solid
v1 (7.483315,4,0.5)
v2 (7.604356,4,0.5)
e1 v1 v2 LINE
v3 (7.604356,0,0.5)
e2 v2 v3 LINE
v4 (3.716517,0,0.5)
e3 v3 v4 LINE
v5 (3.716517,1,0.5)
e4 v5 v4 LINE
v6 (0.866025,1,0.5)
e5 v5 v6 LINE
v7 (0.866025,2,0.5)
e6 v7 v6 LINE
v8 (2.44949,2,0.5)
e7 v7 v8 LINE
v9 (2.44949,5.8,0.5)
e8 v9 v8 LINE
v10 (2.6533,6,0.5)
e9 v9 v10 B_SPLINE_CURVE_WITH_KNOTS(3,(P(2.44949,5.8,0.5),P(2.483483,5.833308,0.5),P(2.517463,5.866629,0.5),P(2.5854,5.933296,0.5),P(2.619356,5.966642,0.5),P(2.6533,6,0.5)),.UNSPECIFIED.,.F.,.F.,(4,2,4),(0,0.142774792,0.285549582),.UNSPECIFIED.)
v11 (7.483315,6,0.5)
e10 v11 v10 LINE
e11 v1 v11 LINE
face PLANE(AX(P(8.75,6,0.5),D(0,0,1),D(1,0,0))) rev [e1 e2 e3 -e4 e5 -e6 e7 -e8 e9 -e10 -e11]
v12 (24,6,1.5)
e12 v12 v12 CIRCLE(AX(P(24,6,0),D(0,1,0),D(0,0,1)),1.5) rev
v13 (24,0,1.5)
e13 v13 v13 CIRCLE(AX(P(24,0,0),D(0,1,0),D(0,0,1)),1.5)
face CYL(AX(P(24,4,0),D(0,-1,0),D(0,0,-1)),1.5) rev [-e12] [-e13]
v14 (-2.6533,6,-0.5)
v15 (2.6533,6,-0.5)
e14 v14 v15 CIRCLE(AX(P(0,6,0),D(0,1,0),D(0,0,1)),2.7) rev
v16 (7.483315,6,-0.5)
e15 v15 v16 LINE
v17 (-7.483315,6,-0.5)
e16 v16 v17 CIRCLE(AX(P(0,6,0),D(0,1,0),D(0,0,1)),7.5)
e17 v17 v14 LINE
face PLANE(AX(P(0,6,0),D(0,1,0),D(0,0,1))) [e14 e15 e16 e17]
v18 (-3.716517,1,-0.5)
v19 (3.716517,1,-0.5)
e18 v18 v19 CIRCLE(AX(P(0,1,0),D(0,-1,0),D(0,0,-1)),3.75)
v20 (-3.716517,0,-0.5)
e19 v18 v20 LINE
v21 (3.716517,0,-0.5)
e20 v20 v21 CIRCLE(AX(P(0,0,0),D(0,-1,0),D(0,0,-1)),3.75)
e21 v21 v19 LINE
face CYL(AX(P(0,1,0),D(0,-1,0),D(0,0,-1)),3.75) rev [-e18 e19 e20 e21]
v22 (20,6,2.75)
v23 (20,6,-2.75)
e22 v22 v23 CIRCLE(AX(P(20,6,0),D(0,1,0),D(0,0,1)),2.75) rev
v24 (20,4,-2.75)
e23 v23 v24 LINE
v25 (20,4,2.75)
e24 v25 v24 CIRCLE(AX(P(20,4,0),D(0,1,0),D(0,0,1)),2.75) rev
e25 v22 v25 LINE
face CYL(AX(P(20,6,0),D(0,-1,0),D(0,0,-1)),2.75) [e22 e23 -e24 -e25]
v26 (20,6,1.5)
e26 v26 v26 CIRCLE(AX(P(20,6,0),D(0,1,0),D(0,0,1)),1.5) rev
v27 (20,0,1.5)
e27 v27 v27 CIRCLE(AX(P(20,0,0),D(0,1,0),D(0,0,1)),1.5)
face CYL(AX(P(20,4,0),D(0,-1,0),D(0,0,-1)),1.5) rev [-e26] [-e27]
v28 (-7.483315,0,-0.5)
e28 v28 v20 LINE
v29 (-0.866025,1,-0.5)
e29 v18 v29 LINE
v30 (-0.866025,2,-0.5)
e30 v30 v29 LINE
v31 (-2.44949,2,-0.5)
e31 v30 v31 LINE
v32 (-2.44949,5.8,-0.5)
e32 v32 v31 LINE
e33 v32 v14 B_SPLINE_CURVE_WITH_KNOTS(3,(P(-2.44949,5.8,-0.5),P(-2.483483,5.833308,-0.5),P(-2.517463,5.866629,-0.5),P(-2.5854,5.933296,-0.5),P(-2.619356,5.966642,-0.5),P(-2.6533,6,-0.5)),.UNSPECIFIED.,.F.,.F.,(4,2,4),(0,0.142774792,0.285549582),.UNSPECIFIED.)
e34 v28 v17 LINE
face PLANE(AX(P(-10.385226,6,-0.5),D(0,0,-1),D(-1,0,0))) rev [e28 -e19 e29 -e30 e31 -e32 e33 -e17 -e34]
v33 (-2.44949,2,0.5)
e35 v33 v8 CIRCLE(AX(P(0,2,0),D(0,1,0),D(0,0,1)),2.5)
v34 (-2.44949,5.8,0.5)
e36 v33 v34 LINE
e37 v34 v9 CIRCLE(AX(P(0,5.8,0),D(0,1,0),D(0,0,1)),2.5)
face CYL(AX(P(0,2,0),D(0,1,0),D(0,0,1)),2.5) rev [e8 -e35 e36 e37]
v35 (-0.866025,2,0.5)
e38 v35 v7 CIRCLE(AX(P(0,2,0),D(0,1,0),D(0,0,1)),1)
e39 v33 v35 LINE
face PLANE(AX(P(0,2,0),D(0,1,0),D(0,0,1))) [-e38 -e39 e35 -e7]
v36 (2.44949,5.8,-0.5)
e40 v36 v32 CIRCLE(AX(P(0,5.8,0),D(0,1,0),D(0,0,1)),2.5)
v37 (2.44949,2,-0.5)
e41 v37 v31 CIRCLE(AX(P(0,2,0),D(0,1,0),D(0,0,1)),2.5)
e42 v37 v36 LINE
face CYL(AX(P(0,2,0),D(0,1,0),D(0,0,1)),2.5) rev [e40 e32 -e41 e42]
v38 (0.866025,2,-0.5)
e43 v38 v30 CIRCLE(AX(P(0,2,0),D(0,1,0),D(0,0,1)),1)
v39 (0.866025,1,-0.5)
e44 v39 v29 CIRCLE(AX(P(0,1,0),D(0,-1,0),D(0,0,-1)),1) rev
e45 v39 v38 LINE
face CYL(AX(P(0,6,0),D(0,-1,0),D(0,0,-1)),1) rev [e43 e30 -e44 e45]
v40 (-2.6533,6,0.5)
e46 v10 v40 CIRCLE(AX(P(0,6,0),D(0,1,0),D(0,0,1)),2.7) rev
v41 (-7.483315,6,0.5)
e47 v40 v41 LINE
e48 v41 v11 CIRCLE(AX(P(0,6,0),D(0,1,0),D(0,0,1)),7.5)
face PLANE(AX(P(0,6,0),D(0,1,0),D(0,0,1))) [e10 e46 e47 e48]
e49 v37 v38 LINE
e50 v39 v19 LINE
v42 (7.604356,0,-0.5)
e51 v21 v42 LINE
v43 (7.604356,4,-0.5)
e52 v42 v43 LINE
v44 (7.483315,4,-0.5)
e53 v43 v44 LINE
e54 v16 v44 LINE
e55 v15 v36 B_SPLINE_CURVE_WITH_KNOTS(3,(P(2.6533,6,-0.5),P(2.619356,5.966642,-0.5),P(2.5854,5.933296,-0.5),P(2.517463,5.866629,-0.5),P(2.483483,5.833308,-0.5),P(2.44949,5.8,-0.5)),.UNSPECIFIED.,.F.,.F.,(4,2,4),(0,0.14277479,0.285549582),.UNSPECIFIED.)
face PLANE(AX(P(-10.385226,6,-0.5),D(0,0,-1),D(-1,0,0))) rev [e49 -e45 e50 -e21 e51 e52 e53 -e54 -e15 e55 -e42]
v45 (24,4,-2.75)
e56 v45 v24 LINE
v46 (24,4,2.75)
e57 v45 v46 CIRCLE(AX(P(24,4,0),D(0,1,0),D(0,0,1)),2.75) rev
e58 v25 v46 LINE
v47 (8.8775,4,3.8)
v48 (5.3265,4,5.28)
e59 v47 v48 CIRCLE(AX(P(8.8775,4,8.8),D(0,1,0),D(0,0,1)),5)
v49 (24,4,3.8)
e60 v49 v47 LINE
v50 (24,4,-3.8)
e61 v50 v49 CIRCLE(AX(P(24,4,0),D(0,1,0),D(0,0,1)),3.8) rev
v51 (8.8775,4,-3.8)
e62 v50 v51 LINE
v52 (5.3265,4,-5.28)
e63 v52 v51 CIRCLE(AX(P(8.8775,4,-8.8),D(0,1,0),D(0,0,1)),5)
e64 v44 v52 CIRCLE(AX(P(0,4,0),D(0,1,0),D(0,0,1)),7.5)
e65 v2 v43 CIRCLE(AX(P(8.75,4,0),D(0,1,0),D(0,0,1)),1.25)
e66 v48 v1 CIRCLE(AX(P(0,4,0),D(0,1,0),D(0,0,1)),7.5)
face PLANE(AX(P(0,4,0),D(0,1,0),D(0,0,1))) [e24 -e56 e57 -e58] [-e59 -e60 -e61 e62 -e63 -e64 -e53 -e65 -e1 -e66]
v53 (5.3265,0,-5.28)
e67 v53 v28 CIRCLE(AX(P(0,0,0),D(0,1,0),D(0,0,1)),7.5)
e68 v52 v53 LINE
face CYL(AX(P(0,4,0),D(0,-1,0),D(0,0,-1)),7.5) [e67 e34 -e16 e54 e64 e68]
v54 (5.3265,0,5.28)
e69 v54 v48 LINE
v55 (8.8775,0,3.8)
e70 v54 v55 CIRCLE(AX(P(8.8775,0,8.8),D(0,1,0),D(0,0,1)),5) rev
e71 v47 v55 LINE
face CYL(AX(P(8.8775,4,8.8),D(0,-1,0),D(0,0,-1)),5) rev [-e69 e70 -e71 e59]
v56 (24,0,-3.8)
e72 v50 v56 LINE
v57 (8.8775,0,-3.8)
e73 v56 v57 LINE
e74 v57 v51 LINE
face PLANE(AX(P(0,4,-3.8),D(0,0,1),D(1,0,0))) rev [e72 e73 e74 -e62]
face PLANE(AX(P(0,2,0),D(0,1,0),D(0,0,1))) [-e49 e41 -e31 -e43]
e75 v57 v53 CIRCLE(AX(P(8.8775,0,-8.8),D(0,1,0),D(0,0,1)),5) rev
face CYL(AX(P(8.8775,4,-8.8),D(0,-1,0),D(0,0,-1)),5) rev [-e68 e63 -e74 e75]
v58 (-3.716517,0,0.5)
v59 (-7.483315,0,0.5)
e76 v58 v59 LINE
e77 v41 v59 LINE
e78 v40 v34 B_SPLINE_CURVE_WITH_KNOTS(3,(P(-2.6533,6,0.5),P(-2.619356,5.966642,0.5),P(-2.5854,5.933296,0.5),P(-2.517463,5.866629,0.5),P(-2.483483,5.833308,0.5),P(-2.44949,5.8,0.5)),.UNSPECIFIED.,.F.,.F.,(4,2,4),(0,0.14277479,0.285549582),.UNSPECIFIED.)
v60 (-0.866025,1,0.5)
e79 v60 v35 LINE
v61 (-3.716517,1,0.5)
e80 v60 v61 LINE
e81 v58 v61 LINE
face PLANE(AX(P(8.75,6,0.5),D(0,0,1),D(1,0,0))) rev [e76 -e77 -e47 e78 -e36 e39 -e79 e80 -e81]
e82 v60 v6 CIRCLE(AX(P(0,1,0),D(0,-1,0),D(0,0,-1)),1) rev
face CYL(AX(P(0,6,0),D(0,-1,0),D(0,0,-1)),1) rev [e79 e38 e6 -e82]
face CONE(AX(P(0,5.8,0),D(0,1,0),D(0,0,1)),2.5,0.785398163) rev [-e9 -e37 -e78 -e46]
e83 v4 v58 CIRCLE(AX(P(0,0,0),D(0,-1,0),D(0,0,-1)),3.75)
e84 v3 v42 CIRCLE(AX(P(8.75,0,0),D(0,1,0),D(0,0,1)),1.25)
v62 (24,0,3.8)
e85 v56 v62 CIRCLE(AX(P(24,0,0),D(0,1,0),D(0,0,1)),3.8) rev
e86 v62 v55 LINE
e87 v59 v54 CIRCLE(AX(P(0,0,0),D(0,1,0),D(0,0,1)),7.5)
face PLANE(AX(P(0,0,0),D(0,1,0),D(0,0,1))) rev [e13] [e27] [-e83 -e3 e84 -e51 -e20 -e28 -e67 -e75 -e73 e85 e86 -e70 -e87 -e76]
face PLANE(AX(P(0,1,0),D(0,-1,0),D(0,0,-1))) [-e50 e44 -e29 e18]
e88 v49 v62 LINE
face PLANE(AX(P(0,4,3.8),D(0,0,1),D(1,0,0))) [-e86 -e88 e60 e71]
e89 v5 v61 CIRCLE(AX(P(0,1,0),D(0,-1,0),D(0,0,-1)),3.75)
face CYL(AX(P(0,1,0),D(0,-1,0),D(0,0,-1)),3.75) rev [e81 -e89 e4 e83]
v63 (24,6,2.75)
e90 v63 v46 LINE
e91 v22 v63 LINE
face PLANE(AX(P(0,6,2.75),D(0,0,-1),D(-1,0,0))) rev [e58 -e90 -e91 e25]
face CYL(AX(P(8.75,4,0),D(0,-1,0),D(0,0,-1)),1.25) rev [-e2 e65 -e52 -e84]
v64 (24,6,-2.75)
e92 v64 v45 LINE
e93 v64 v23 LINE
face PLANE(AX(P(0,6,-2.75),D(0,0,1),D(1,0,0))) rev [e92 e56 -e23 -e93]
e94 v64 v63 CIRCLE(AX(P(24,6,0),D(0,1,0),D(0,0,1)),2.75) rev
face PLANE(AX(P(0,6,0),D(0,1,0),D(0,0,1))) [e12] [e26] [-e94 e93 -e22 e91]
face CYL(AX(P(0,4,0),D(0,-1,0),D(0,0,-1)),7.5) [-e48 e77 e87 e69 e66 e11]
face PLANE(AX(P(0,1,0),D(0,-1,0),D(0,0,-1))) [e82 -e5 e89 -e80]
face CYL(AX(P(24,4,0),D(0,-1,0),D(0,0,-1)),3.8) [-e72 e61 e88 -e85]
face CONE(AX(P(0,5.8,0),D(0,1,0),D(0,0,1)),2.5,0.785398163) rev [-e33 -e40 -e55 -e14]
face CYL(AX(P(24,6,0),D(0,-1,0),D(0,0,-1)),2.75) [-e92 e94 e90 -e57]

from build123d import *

# Parameters (mm, degrees)
SKETCH1_R           = 1.2499999999999998
SKETCH1_R_2         = 1.5000000000000007
BOSS_EXTRUDE2_DEPTH = 4
SKETCH2_R           = 7.5
BOSS_EXTRUDE3_DEPTH = 2
SKETCH3_R           = 1.4999999999999967
BOSS_EXTRUDE4_DEPTH = 2
SKETCH4_R           = 2.5
CUT_EXTRUDE1_DEPTH  = 4
SKETCH5_R           = 1
CUT_EXTRUDE2_DEPTH  = 30.412412345810736
SKETCH6_R           = 3.75
CUT_EXTRUDE3_DEPTH  = 1
CUT_EXTRUDE4_DEPTH  = 30.412412345810736
FILLET2_R           = 5
FILLET3_R           = 5
CHAMFER1_SIZE       = 0.2


with BuildPart() as part:
    # Sketch1 → Boss-Extrude2 (new body)
    with BuildSketch(Plane(origin=(0, 0, 0), x_dir=(1, 0, 0), z_dir=(0, 1, 0))):
        with BuildLine():
            ThreePointArc((24, -3.8000000000000003), (27.799999999999997, 6e-17), (24, 3.8000000000000003))
            Line((24, 3.8), (6.466065264130883, 3.8))
            ThreePointArc((6.466065264130884, 3.8000000000000003), (-7.5, 9.2e-16), (6.466065264130884, -3.800000000000001))
            Line((6.466065264130883, -3.7999999999999994), (24, -3.7999999999999994))
        make_face()
        with Locations((8.75, -6.7e-16)):
            Circle(SKETCH1_R, mode=Mode.SUBTRACT)
        with Locations((20, 0)):
            Circle(SKETCH1_R_2, mode=Mode.SUBTRACT)
        with Locations((24, 0)):
            Circle(SKETCH1_R_2, mode=Mode.SUBTRACT)
    extrude(amount=BOSS_EXTRUDE2_DEPTH)

    # Sketch2 → Boss-Extrude3 (add)
    with BuildSketch(Plane(origin=(0, 4, 0), x_dir=(1, 0, 0), z_dir=(0, 1, 0))):
        Circle(SKETCH2_R)
    extrude(amount=BOSS_EXTRUDE3_DEPTH)

    # Sketch3 → Boss-Extrude4 (add)
    with BuildSketch(Plane(origin=(0, 4, 0), x_dir=(1, 0, 0), z_dir=(0, 1, 0))):
        with BuildLine():
            ThreePointArc((26.75, -5.5e-16), (25.944543648263004, 1.9445436482630067), (23.999999999999996, 2.75))
            Line((23.999999999999996, 2.7500000000000004), (19.999999999999996, 2.7500000000000004))
            ThreePointArc((19.999999999999996, 2.7500000000000004), (18.05545635173699, 1.9445436482630059), (17.249999999999996, -3.3e-16))
            ThreePointArc((17.249999999999996, -3.3e-16), (18.055456351736993, -1.9445436482630054), (19.999999999999996, -2.7499999999999996))
            Line((19.999999999999996, -2.7499999999999996), (23.999999999999996, -2.7500000000000004))
            ThreePointArc((23.999999999999996, -2.75), (25.944543648263004, -1.9445436482630074), (26.75, 6e-17))
        make_face()
        with BuildLine():
            ThreePointArc((21.499999999999996, 7e-17), (19.999999999999996, -1.5000000000000002), (18.499999999999996, 6.2e-16))
            ThreePointArc((18.499999999999996, 6.2e-16), (19.999999999999996, 1.500000000000001), (21.499999999999996, 4.3e-16))
        make_face(mode=Mode.SUBTRACT)
        with Locations((23.999999999999996, 0)):
            Circle(SKETCH3_R, mode=Mode.SUBTRACT)
    extrude(amount=BOSS_EXTRUDE4_DEPTH)

    # Sketch4 → Cut-Extrude1 (cut)
    with BuildSketch(Plane(origin=(0, 6, 0), x_dir=(1, 0, 0), z_dir=(0, 1, 0))):
        Circle(SKETCH4_R)
    extrude(amount=-CUT_EXTRUDE1_DEPTH, mode=Mode.SUBTRACT)

    # Sketch5 → Cut-Extrude2 (cut, through all)
    with BuildSketch(Plane(origin=(0, 0, 0), x_dir=(-1, 0, 0), z_dir=(0, -1, 0))):
        Circle(SKETCH5_R)
    extrude(amount=-CUT_EXTRUDE2_DEPTH, mode=Mode.SUBTRACT)

    # Sketch6 → Cut-Extrude3 (cut)
    with BuildSketch(Plane(origin=(0, 0, 0), x_dir=(-1, 0, 0), z_dir=(0, -1, 0))):
        Circle(SKETCH6_R)
    extrude(amount=-CUT_EXTRUDE3_DEPTH, mode=Mode.SUBTRACT)

    # Sketch7 → Cut-Extrude4 (cut, through all)
    with BuildSketch(Plane(origin=(0, 0, 0), x_dir=(-1, 0, 0), z_dir=(0, -1, 0))):
        Polygon((-8.75, 0), (-8.75, -0.5), (10.385226010390808, -0.5), (10.385226010390808, 0.5), (-8.75, 0.5), align=None)
    extrude(amount=-CUT_EXTRUDE4_DEPTH, mode=Mode.SUBTRACT)

    # Fillet2
    fillet2_edges = [part.edges().sort_by_distance(p)[0] for p in [
        (6.466065264130883, 2, -3.8),
    ]]
    fillet(fillet2_edges, radius=FILLET2_R)

    # Fillet3
    fillet3_edges = [part.edges().sort_by_distance(p)[0] for p in [
        (6.466065264130884, 2, 3.799999999999999),
    ]]
    fillet(fillet3_edges, radius=FILLET3_R)

    # Chamfer1
    chamfer1_edges = [part.edges().sort_by_distance(p)[0] for p in [
        (1.5e-16, 6, -2.5),
        (-4.6e-16, 6, 2.5),
    ]]
    chamfer(chamfer1_edges, length=CHAMFER1_SIZE)


solid = part.part
